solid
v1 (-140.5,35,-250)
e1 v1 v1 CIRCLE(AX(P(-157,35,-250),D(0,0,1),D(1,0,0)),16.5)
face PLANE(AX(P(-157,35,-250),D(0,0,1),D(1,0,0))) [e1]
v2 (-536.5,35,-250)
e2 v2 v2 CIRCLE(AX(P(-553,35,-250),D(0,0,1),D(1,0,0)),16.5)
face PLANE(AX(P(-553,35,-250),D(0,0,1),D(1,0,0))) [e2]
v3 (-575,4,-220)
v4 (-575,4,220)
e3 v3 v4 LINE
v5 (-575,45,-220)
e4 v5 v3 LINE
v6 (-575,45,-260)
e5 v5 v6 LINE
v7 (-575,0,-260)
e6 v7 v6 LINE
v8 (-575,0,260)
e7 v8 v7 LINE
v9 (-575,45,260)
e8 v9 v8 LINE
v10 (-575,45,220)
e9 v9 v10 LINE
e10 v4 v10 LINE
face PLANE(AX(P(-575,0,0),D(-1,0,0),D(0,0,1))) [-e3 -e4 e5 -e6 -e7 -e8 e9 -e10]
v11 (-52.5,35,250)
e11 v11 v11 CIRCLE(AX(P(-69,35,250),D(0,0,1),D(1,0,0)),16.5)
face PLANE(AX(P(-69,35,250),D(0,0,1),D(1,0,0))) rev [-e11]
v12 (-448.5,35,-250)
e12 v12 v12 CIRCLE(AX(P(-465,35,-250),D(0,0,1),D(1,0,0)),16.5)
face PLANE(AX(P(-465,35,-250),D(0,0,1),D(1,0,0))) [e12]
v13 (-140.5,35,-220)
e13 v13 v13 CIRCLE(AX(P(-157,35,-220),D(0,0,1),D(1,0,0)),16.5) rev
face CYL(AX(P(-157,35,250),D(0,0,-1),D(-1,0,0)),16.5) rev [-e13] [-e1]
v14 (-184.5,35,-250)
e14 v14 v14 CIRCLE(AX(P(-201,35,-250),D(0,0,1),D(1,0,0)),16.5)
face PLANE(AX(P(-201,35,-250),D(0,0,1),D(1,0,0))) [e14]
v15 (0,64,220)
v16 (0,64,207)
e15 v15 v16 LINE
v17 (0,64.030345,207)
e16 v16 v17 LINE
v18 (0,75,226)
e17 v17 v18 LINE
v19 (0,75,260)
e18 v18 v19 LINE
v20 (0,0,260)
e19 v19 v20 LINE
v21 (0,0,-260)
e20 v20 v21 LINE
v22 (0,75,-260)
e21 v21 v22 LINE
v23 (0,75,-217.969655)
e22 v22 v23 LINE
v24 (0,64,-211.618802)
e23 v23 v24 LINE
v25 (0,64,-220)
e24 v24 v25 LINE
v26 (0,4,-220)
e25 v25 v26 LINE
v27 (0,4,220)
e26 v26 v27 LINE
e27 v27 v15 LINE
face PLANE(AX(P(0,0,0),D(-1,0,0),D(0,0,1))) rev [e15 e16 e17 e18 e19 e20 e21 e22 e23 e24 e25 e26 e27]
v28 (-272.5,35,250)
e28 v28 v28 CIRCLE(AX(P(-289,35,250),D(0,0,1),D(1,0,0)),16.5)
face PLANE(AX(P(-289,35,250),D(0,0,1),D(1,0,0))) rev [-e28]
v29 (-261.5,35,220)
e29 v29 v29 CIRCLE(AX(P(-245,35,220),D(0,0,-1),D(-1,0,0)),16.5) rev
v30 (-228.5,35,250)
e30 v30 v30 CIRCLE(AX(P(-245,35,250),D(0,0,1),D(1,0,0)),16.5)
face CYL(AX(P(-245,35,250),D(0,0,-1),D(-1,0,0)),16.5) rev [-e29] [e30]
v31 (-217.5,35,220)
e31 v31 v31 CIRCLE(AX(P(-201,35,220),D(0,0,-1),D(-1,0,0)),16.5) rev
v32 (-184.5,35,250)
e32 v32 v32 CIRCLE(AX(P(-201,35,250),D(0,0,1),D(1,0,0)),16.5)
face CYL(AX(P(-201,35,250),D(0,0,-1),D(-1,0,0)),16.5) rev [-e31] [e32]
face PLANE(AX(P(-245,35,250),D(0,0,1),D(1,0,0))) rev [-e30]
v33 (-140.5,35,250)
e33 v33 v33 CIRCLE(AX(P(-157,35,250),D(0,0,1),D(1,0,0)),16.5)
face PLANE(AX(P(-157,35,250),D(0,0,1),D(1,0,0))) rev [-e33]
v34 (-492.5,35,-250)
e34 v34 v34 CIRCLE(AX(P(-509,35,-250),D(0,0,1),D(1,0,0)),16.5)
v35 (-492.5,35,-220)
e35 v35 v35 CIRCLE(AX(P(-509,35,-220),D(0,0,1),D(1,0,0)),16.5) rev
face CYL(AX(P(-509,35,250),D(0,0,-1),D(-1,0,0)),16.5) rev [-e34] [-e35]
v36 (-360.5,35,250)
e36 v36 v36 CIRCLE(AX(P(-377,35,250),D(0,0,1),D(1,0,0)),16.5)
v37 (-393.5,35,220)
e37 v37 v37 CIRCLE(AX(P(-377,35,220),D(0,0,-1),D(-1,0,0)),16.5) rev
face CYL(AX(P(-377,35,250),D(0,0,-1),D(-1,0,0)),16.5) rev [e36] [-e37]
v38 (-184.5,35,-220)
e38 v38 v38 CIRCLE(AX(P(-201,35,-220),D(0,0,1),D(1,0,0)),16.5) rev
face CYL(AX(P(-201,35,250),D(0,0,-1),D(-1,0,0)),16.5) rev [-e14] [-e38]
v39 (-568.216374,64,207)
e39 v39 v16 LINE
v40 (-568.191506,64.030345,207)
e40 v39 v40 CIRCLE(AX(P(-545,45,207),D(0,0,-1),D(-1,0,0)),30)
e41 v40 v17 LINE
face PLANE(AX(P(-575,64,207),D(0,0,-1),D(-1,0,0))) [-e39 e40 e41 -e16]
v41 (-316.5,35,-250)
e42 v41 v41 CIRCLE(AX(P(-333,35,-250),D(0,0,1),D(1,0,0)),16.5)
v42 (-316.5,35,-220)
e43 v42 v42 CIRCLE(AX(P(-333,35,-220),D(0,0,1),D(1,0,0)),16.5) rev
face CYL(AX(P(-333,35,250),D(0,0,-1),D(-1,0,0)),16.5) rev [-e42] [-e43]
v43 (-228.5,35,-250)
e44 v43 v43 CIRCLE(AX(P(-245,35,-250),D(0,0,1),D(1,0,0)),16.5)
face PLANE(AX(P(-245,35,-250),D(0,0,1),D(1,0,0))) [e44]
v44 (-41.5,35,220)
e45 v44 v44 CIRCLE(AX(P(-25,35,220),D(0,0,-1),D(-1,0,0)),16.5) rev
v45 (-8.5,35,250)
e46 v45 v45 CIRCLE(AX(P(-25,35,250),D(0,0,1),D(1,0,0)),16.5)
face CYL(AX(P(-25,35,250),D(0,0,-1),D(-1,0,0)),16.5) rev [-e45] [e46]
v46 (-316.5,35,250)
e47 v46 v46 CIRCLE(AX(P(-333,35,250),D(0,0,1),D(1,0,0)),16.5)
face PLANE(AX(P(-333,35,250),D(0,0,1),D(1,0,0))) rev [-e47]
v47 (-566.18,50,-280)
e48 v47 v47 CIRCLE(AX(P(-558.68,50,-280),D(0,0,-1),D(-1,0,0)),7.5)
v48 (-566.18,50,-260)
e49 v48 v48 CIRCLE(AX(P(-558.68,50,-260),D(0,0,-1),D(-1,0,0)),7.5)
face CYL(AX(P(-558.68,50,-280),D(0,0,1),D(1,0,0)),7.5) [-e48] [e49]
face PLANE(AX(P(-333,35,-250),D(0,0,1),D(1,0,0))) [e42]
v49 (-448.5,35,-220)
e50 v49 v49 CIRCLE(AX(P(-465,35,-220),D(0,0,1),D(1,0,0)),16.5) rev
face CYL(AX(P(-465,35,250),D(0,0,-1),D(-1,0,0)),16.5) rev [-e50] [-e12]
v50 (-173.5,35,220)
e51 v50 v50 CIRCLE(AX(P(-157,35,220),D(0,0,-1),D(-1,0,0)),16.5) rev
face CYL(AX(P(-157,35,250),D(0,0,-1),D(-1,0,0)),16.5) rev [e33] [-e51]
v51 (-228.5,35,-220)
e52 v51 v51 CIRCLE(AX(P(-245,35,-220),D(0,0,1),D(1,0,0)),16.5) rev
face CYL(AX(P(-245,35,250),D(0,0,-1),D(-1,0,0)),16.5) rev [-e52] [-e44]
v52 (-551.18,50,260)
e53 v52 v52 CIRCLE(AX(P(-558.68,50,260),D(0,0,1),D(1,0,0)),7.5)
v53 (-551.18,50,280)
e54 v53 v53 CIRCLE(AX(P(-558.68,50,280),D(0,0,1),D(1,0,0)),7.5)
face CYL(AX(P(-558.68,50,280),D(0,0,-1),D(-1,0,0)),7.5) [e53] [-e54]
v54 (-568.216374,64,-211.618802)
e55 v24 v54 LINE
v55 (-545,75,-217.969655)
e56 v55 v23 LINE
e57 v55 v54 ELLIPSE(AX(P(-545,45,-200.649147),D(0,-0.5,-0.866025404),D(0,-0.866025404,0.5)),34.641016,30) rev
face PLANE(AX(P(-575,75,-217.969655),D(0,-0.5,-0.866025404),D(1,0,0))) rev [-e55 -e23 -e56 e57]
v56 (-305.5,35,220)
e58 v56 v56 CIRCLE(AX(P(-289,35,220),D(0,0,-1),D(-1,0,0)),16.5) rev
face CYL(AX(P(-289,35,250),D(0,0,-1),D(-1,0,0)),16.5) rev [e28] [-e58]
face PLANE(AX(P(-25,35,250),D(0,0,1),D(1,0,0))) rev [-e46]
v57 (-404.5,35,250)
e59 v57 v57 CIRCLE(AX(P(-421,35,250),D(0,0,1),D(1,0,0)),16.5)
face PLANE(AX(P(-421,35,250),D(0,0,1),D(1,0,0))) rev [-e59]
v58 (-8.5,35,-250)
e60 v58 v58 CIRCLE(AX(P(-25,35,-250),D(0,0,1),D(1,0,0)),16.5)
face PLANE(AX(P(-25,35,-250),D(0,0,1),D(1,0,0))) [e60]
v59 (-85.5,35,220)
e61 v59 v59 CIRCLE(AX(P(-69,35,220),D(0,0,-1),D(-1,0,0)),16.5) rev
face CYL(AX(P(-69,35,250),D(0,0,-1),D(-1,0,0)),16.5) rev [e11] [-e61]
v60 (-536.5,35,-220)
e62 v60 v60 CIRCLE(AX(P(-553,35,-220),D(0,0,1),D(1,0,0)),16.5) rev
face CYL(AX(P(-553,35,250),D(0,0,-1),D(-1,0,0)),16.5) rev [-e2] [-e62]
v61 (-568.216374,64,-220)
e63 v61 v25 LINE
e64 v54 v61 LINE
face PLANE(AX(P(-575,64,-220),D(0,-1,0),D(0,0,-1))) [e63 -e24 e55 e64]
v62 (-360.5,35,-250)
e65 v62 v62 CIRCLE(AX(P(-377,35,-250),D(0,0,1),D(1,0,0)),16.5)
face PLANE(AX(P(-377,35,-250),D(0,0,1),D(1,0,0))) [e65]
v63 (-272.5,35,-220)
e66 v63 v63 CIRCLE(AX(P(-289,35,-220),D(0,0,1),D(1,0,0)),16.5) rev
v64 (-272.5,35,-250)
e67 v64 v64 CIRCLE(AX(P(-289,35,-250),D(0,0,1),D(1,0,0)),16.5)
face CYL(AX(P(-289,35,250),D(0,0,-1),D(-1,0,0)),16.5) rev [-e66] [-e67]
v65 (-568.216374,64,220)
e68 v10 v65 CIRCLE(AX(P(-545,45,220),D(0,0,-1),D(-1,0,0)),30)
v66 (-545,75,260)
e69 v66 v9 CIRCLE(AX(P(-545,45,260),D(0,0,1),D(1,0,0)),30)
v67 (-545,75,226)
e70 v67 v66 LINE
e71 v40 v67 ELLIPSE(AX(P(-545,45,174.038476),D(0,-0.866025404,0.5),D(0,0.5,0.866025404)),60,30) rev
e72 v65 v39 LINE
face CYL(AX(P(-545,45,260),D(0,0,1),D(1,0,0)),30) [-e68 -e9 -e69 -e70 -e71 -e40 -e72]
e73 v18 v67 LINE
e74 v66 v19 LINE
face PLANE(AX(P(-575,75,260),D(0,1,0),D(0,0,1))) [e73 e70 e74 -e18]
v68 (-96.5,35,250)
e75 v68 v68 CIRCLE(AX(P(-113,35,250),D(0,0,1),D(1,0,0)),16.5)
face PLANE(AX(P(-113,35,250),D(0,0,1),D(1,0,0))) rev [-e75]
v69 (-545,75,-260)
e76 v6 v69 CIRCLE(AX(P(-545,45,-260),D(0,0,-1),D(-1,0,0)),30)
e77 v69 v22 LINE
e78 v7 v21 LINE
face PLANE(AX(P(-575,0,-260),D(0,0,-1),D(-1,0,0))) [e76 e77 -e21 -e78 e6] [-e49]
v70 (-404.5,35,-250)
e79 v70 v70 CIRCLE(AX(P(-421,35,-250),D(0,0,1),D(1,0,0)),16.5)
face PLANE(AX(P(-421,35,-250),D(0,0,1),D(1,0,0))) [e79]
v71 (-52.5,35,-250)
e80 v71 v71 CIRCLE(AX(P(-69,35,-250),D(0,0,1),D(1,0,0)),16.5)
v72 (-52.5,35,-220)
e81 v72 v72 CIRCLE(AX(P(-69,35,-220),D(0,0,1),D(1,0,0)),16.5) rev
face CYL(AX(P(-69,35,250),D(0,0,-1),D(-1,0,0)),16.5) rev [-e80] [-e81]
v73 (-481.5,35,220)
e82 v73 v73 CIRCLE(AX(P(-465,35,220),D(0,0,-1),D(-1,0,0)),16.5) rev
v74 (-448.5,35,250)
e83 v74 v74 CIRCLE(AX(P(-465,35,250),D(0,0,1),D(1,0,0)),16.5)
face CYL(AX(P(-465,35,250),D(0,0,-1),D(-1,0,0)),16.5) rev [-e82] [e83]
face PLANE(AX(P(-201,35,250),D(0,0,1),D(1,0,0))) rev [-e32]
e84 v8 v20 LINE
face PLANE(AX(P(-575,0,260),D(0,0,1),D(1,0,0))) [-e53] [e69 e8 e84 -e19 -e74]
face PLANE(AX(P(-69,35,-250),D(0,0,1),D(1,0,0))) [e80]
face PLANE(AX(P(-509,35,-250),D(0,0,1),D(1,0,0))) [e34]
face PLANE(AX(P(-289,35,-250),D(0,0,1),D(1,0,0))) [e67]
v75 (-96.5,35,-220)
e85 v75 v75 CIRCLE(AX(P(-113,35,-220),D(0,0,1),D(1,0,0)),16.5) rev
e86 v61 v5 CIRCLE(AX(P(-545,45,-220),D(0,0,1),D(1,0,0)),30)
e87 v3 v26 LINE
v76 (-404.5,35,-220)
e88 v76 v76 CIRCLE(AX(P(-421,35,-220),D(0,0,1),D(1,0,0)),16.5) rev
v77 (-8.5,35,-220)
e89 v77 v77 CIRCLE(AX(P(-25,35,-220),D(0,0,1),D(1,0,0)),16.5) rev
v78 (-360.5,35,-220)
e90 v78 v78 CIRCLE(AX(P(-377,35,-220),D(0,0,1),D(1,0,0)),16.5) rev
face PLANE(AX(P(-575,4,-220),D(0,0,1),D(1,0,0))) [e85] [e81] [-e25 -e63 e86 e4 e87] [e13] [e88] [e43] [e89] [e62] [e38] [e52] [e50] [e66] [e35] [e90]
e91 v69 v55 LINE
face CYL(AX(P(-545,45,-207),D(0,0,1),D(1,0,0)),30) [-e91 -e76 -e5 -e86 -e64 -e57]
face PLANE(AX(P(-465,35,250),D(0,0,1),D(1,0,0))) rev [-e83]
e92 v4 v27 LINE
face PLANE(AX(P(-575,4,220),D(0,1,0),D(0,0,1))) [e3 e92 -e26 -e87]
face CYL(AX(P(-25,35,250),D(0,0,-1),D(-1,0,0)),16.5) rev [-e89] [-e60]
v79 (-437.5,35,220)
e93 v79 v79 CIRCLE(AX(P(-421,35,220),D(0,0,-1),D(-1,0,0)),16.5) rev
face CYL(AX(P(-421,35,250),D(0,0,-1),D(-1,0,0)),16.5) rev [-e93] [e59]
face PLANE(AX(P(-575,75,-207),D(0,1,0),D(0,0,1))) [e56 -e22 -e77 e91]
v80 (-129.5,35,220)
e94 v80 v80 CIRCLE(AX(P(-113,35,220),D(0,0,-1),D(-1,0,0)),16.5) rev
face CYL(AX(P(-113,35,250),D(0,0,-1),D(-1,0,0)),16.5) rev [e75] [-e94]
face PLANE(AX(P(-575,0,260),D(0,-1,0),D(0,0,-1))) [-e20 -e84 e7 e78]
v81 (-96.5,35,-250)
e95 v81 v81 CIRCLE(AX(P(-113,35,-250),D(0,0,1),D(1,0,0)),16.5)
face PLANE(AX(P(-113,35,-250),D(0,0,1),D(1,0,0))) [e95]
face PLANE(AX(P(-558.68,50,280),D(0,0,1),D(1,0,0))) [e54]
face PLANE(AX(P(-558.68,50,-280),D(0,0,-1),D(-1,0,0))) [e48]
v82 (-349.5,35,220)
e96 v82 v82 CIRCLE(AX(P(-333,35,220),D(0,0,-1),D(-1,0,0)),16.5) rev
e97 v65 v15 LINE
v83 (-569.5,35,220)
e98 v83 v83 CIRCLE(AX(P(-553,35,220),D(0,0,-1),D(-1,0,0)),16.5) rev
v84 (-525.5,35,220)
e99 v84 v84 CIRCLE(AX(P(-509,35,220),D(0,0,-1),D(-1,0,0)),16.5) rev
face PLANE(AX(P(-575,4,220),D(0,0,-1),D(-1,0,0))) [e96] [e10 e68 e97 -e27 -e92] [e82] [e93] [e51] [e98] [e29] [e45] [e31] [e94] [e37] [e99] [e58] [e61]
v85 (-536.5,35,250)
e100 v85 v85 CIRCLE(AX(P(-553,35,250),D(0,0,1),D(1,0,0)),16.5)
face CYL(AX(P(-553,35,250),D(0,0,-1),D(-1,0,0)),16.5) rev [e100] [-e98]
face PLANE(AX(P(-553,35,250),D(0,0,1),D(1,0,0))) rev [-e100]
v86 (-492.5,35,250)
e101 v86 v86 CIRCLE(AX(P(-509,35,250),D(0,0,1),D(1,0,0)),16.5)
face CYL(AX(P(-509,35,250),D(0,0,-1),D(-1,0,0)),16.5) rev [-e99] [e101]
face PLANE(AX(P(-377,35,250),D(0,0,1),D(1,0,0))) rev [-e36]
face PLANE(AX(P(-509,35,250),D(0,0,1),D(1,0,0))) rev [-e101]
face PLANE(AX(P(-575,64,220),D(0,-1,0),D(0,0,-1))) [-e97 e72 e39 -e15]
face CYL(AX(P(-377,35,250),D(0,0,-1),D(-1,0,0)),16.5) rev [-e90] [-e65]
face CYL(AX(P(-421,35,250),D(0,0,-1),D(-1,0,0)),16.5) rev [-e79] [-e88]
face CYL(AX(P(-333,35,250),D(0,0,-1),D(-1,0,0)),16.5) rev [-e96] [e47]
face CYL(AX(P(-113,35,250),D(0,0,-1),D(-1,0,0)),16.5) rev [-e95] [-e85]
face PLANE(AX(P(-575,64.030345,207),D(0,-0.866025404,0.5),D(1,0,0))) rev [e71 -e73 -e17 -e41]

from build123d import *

# Parameters (mm, degrees)
BOSS_EXTRUDE1_DEPTH     = 575
CHAMFER1_SIZE           = 10.969655115
CHAMFER1_SIZE_2         = 19
FILLET1_R               = 30
CUT_EXTRUDE1_DEPTH      = 250
CUT_EXTRUDE1_DEPTH_BACK = 250
SKETCH3_R               = 16.5
SKETCH4_R               = 7.5
BOSS_EXTRUDE2_DEPTH     = 20
BOSS_EXTRUDE3_START     = 20
SKETCH5_R               = 7.5
BOSS_EXTRUDE3_DEPTH     = 20


with BuildPart() as part:
    # Sketch2 → Boss-Extrude1 (new body)
    with BuildSketch(Plane(origin=(0, 0, 0), x_dir=(0, 0, -1), z_dir=(1, 0, 0))):
        Polygon((-260, 0), (260, 0), (260, 75), (207, 75), (207, 64), (220, 64), (220, 4), (-220, 4), (-220, 64), (-207, 64), (-207, 75), (-260, 75), align=None)
    extrude(amount=-BOSS_EXTRUDE1_DEPTH)

    # Chamfer1
    # the kernel refuses this chamfer: 19, 10.969655115 mm, written as the material it takes off along each edge
    with BuildSketch(Plane(origin=(49.154629338, 75, -207), x_dir=(0, 0.057893862402671324, -0.9983227437537925), z_dir=(-1, 0, 0)), Plane(origin=(49.154629338, 75, 207), x_dir=(0, -0.9983227437537926, -0.057893862402671296), z_dir=(-1, 0, 0))) as chamfer1_piece_1:
        Polygon((CHAMFER1_SIZE * 0.998322743718, CHAMFER1_SIZE * 0.0578938624006), (-CHAMFER1_SIZE_2 * 0.0578938624027, CHAMFER1_SIZE_2 * 0.998322743754), (0, 0), align=None)
    extrude(amount=673.309258677, mode=Mode.SUBTRACT)

    # Fillet1
    fillet1_edges = [part.edges().sort_by_distance(p)[0] for p in [
        (-575, 75, 243),
        (-575, 75, -238.984827557),
    ]]
    fillet(fillet1_edges, radius=FILLET1_R)

    # Sketch3 → Cut-Extrude1 (cut, two sides: drawn at the far end of the back side and taken through both)
    with BuildSketch(Plane.XY.offset(-CUT_EXTRUDE1_DEPTH_BACK)):
        with Locations((-25, 35)):
            Circle(SKETCH3_R)
        with Locations((-69, 35)):
            Circle(SKETCH3_R)
        with Locations((-113, 35)):
            Circle(SKETCH3_R)
        with Locations((-157, 35)):
            Circle(SKETCH3_R)
        with Locations((-201, 35)):
            Circle(SKETCH3_R)
        with Locations((-245, 35)):
            Circle(SKETCH3_R)
        with Locations((-289, 35)):
            Circle(SKETCH3_R)
        with Locations((-333, 35)):
            Circle(SKETCH3_R)
        with Locations((-377, 35)):
            Circle(SKETCH3_R)
        with Locations((-421, 35)):
            Circle(SKETCH3_R)
        with Locations((-465, 35)):
            Circle(SKETCH3_R)
        with Locations((-509, 35)):
            Circle(SKETCH3_R)
        with Locations((-553, 35)):
            Circle(SKETCH3_R)
    extrude(amount=CUT_EXTRUDE1_DEPTH + CUT_EXTRUDE1_DEPTH_BACK, mode=Mode.SUBTRACT)

    # Sketch4 → Boss-Extrude2 (add)
    with BuildSketch(Plane.XY.offset(260)):
        with Locations((-558.68, 50)):
            Circle(SKETCH4_R)
    extrude(amount=BOSS_EXTRUDE2_DEPTH)

    # Sketch5 → Boss-Extrude3 (add)
    with BuildSketch(Plane(origin=(0, 0, -260), x_dir=(-1, 0, 0), z_dir=(0, 0, -1)).offset(BOSS_EXTRUDE3_START)):
        with Locations(Location((558.68, 50, 0), (0, 0, 180))):
            Circle(SKETCH5_R)
    extrude(amount=-BOSS_EXTRUDE3_DEPTH)


solid = part.part
